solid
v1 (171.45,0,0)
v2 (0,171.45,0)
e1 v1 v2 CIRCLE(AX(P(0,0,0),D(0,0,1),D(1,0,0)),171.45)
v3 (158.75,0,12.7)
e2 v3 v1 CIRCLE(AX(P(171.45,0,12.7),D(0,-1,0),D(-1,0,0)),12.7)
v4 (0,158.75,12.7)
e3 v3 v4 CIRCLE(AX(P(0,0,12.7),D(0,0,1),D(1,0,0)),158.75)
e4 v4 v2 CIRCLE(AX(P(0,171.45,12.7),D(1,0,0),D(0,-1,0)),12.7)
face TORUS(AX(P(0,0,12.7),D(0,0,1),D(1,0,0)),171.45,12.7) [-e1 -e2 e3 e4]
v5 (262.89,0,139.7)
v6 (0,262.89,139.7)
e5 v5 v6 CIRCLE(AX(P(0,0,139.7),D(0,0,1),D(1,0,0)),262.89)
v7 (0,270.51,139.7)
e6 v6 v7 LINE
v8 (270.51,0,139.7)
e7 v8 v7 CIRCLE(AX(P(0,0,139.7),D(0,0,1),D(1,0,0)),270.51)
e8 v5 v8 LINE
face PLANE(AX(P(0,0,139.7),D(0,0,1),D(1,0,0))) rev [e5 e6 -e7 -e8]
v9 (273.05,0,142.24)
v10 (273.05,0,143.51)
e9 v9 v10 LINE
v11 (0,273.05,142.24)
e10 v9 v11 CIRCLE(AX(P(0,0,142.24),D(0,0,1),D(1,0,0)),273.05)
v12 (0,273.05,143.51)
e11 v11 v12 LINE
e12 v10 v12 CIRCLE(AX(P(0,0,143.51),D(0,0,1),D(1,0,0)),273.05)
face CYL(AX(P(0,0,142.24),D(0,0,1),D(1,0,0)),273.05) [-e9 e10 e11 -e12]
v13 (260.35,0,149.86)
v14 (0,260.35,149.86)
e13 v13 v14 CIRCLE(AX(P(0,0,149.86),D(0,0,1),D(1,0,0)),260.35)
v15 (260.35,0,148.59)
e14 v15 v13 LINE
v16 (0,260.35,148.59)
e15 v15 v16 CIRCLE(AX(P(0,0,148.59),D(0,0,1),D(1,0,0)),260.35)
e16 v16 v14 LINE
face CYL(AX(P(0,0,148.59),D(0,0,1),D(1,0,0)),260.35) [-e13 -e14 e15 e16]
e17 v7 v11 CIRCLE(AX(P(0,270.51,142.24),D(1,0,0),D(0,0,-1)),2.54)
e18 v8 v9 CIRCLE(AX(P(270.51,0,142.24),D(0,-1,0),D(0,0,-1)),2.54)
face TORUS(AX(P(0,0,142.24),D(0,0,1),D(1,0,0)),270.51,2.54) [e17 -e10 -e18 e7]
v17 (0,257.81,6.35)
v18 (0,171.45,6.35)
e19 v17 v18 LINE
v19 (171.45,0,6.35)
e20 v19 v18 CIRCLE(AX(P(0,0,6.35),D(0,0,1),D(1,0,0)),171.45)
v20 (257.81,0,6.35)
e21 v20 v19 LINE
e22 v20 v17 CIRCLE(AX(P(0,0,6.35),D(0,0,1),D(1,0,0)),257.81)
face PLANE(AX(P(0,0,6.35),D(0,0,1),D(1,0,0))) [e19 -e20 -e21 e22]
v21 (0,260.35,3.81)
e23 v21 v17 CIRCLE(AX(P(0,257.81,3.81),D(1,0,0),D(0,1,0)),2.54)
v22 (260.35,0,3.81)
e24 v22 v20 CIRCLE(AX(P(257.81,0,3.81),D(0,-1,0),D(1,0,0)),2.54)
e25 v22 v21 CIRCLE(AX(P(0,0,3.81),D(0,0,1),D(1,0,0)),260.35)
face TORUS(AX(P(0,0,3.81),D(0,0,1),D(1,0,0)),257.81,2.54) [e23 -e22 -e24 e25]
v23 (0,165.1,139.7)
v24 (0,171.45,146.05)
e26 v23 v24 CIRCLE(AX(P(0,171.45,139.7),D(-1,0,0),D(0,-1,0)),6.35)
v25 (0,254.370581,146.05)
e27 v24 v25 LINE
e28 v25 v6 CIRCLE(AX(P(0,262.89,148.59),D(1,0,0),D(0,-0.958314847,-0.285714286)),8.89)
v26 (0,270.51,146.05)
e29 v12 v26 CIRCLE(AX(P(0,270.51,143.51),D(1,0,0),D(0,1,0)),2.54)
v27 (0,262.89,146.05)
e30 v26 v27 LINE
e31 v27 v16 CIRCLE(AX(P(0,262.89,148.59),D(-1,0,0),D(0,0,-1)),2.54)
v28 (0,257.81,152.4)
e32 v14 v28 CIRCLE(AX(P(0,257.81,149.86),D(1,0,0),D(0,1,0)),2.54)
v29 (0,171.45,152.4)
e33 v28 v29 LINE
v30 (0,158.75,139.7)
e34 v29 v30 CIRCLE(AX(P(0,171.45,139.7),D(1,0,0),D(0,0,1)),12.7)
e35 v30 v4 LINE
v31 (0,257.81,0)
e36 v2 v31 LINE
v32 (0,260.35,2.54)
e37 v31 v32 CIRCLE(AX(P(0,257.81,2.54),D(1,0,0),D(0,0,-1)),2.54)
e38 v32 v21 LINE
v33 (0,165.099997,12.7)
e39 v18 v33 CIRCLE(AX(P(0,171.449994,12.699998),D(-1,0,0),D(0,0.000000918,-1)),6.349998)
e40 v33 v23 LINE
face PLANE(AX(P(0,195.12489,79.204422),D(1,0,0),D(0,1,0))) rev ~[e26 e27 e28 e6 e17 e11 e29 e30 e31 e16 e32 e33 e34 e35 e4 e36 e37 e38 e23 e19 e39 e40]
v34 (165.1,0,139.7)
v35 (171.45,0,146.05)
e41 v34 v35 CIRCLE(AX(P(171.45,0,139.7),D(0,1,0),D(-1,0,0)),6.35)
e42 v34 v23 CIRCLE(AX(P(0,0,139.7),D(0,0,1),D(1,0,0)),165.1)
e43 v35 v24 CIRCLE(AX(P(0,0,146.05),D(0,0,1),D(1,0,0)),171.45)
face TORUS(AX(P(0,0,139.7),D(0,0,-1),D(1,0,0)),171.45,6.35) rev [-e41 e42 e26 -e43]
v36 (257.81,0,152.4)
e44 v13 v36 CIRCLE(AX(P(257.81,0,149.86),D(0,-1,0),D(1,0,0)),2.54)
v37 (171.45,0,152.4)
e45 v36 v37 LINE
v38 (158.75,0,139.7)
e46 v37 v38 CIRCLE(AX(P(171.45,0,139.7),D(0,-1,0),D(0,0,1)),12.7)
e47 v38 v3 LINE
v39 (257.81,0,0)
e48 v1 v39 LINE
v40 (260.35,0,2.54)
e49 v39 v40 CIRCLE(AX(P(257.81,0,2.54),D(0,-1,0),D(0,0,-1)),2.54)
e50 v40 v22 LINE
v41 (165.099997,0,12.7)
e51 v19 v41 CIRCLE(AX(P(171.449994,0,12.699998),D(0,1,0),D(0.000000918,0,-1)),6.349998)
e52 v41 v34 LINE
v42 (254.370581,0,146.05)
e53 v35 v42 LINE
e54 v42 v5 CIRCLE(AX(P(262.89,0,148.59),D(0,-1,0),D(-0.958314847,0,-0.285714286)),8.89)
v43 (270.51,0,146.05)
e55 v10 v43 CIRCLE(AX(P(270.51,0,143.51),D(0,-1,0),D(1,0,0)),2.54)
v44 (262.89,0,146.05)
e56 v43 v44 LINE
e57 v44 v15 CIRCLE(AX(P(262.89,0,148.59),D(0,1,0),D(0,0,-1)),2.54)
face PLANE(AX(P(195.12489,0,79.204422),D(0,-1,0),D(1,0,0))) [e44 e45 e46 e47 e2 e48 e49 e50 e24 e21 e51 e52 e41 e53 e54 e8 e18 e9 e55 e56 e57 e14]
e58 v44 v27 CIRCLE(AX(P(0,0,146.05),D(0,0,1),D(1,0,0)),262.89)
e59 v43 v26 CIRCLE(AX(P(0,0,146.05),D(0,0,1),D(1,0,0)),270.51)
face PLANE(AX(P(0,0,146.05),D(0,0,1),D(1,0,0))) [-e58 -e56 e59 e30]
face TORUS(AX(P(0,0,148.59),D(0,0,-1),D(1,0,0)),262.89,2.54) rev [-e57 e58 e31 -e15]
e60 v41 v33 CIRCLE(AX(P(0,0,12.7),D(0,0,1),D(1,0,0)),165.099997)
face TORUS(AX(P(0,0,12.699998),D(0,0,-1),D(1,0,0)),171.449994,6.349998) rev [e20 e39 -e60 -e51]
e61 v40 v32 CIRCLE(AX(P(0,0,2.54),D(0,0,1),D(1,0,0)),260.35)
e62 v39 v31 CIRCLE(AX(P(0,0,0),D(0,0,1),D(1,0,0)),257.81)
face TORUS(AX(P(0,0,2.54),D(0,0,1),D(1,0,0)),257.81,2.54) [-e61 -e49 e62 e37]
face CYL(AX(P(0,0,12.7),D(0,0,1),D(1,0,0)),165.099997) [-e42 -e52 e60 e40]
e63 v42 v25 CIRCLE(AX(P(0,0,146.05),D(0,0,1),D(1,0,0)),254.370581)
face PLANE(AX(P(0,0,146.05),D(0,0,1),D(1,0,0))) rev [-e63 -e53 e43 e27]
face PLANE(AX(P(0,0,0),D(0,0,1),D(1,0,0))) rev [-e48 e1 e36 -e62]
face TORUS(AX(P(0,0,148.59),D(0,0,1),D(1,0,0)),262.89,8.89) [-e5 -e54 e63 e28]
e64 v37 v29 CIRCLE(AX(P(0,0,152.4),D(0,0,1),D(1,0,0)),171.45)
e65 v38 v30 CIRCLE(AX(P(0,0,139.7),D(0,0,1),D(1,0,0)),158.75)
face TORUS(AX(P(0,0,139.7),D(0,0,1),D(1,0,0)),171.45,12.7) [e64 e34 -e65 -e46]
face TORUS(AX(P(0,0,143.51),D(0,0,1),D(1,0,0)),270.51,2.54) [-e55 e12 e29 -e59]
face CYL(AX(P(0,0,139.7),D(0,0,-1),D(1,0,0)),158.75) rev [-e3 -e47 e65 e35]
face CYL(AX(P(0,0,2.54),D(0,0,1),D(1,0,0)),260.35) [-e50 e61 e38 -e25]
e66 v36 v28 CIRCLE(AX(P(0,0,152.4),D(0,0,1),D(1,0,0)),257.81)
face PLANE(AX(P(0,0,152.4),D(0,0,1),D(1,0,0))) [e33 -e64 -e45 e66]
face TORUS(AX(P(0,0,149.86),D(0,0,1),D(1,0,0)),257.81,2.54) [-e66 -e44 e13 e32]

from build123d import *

# Parameters (mm, degrees)
F1_ANGLE = 90


# Not quite as in the source:
# - ends of sketch curves that miss each other by under 0.0002 mm in the source are joined


with BuildPart() as f1:
    # F0 (on Front) → F1 (revolve)
    with BuildSketch(Plane.XZ):
        with BuildLine():
            Line((158.75, 139.7), (158.75, 12.7))
            ThreePointArc((158.75, 12.7), (162.4697438789, 3.7197438789), (171.45, 0))
            Line((171.45, 0), (257.81, 0))
            ThreePointArc((257.81, 0), (259.6060512242, 0.7439487758), (260.35, 2.54))
            Line((260.35, 2.54), (260.35, 3.8099999233))
            ThreePointArc((260.35, 3.8099999233), (259.6060512242, 5.6060511475), (257.81, 6.3499999233))
            Line((257.81, 6.3499999233), (171.45, 6.3499999233))
            ThreePointArc((171.45, 6.3499999233), (166.9598694704, 8.2098694704), (165.0999965083, 12.7))
            Line((165.0999965083, 12.7), (165.1, 139.7))
            ThreePointArc((165.1, 139.7), (166.9598719395, 144.1901280605), (171.45, 146.05))
            Line((171.45, 146.05), (254.3705810057, 146.05))
            ThreePointArc((254.3705810057, 146.05), (257.5772088315, 141.4621426782), (262.89, 139.7))
            Line((262.89, 139.7), (270.51, 139.7))
            ThreePointArc((270.51, 139.7), (272.3060512242, 140.4439487758), (273.05, 142.24))
            Line((273.05, 142.24), (273.05, 143.51))
            ThreePointArc((273.05, 143.51), (272.3060512242, 145.3060512242), (270.51, 146.05))
            Line((270.51, 146.05), (262.89, 146.05))
            ThreePointArc((262.89, 146.05), (261.0939487758, 146.7939487758), (260.35, 148.59))
            Line((260.35, 148.59), (260.35, 149.86))
            ThreePointArc((260.35, 149.86), (259.6060512242, 151.6560512242), (257.81, 152.4))
            Line((257.81, 152.4), (171.45, 152.4))
            ThreePointArc((171.45, 152.4), (162.4697438789, 148.6802561211), (158.75, 139.7))
        make_face()
    revolve(axis=Axis((0, 0, 68.397693336), (0, 0, 1)), revolution_arc=F1_ANGLE)


solid = f1.part
